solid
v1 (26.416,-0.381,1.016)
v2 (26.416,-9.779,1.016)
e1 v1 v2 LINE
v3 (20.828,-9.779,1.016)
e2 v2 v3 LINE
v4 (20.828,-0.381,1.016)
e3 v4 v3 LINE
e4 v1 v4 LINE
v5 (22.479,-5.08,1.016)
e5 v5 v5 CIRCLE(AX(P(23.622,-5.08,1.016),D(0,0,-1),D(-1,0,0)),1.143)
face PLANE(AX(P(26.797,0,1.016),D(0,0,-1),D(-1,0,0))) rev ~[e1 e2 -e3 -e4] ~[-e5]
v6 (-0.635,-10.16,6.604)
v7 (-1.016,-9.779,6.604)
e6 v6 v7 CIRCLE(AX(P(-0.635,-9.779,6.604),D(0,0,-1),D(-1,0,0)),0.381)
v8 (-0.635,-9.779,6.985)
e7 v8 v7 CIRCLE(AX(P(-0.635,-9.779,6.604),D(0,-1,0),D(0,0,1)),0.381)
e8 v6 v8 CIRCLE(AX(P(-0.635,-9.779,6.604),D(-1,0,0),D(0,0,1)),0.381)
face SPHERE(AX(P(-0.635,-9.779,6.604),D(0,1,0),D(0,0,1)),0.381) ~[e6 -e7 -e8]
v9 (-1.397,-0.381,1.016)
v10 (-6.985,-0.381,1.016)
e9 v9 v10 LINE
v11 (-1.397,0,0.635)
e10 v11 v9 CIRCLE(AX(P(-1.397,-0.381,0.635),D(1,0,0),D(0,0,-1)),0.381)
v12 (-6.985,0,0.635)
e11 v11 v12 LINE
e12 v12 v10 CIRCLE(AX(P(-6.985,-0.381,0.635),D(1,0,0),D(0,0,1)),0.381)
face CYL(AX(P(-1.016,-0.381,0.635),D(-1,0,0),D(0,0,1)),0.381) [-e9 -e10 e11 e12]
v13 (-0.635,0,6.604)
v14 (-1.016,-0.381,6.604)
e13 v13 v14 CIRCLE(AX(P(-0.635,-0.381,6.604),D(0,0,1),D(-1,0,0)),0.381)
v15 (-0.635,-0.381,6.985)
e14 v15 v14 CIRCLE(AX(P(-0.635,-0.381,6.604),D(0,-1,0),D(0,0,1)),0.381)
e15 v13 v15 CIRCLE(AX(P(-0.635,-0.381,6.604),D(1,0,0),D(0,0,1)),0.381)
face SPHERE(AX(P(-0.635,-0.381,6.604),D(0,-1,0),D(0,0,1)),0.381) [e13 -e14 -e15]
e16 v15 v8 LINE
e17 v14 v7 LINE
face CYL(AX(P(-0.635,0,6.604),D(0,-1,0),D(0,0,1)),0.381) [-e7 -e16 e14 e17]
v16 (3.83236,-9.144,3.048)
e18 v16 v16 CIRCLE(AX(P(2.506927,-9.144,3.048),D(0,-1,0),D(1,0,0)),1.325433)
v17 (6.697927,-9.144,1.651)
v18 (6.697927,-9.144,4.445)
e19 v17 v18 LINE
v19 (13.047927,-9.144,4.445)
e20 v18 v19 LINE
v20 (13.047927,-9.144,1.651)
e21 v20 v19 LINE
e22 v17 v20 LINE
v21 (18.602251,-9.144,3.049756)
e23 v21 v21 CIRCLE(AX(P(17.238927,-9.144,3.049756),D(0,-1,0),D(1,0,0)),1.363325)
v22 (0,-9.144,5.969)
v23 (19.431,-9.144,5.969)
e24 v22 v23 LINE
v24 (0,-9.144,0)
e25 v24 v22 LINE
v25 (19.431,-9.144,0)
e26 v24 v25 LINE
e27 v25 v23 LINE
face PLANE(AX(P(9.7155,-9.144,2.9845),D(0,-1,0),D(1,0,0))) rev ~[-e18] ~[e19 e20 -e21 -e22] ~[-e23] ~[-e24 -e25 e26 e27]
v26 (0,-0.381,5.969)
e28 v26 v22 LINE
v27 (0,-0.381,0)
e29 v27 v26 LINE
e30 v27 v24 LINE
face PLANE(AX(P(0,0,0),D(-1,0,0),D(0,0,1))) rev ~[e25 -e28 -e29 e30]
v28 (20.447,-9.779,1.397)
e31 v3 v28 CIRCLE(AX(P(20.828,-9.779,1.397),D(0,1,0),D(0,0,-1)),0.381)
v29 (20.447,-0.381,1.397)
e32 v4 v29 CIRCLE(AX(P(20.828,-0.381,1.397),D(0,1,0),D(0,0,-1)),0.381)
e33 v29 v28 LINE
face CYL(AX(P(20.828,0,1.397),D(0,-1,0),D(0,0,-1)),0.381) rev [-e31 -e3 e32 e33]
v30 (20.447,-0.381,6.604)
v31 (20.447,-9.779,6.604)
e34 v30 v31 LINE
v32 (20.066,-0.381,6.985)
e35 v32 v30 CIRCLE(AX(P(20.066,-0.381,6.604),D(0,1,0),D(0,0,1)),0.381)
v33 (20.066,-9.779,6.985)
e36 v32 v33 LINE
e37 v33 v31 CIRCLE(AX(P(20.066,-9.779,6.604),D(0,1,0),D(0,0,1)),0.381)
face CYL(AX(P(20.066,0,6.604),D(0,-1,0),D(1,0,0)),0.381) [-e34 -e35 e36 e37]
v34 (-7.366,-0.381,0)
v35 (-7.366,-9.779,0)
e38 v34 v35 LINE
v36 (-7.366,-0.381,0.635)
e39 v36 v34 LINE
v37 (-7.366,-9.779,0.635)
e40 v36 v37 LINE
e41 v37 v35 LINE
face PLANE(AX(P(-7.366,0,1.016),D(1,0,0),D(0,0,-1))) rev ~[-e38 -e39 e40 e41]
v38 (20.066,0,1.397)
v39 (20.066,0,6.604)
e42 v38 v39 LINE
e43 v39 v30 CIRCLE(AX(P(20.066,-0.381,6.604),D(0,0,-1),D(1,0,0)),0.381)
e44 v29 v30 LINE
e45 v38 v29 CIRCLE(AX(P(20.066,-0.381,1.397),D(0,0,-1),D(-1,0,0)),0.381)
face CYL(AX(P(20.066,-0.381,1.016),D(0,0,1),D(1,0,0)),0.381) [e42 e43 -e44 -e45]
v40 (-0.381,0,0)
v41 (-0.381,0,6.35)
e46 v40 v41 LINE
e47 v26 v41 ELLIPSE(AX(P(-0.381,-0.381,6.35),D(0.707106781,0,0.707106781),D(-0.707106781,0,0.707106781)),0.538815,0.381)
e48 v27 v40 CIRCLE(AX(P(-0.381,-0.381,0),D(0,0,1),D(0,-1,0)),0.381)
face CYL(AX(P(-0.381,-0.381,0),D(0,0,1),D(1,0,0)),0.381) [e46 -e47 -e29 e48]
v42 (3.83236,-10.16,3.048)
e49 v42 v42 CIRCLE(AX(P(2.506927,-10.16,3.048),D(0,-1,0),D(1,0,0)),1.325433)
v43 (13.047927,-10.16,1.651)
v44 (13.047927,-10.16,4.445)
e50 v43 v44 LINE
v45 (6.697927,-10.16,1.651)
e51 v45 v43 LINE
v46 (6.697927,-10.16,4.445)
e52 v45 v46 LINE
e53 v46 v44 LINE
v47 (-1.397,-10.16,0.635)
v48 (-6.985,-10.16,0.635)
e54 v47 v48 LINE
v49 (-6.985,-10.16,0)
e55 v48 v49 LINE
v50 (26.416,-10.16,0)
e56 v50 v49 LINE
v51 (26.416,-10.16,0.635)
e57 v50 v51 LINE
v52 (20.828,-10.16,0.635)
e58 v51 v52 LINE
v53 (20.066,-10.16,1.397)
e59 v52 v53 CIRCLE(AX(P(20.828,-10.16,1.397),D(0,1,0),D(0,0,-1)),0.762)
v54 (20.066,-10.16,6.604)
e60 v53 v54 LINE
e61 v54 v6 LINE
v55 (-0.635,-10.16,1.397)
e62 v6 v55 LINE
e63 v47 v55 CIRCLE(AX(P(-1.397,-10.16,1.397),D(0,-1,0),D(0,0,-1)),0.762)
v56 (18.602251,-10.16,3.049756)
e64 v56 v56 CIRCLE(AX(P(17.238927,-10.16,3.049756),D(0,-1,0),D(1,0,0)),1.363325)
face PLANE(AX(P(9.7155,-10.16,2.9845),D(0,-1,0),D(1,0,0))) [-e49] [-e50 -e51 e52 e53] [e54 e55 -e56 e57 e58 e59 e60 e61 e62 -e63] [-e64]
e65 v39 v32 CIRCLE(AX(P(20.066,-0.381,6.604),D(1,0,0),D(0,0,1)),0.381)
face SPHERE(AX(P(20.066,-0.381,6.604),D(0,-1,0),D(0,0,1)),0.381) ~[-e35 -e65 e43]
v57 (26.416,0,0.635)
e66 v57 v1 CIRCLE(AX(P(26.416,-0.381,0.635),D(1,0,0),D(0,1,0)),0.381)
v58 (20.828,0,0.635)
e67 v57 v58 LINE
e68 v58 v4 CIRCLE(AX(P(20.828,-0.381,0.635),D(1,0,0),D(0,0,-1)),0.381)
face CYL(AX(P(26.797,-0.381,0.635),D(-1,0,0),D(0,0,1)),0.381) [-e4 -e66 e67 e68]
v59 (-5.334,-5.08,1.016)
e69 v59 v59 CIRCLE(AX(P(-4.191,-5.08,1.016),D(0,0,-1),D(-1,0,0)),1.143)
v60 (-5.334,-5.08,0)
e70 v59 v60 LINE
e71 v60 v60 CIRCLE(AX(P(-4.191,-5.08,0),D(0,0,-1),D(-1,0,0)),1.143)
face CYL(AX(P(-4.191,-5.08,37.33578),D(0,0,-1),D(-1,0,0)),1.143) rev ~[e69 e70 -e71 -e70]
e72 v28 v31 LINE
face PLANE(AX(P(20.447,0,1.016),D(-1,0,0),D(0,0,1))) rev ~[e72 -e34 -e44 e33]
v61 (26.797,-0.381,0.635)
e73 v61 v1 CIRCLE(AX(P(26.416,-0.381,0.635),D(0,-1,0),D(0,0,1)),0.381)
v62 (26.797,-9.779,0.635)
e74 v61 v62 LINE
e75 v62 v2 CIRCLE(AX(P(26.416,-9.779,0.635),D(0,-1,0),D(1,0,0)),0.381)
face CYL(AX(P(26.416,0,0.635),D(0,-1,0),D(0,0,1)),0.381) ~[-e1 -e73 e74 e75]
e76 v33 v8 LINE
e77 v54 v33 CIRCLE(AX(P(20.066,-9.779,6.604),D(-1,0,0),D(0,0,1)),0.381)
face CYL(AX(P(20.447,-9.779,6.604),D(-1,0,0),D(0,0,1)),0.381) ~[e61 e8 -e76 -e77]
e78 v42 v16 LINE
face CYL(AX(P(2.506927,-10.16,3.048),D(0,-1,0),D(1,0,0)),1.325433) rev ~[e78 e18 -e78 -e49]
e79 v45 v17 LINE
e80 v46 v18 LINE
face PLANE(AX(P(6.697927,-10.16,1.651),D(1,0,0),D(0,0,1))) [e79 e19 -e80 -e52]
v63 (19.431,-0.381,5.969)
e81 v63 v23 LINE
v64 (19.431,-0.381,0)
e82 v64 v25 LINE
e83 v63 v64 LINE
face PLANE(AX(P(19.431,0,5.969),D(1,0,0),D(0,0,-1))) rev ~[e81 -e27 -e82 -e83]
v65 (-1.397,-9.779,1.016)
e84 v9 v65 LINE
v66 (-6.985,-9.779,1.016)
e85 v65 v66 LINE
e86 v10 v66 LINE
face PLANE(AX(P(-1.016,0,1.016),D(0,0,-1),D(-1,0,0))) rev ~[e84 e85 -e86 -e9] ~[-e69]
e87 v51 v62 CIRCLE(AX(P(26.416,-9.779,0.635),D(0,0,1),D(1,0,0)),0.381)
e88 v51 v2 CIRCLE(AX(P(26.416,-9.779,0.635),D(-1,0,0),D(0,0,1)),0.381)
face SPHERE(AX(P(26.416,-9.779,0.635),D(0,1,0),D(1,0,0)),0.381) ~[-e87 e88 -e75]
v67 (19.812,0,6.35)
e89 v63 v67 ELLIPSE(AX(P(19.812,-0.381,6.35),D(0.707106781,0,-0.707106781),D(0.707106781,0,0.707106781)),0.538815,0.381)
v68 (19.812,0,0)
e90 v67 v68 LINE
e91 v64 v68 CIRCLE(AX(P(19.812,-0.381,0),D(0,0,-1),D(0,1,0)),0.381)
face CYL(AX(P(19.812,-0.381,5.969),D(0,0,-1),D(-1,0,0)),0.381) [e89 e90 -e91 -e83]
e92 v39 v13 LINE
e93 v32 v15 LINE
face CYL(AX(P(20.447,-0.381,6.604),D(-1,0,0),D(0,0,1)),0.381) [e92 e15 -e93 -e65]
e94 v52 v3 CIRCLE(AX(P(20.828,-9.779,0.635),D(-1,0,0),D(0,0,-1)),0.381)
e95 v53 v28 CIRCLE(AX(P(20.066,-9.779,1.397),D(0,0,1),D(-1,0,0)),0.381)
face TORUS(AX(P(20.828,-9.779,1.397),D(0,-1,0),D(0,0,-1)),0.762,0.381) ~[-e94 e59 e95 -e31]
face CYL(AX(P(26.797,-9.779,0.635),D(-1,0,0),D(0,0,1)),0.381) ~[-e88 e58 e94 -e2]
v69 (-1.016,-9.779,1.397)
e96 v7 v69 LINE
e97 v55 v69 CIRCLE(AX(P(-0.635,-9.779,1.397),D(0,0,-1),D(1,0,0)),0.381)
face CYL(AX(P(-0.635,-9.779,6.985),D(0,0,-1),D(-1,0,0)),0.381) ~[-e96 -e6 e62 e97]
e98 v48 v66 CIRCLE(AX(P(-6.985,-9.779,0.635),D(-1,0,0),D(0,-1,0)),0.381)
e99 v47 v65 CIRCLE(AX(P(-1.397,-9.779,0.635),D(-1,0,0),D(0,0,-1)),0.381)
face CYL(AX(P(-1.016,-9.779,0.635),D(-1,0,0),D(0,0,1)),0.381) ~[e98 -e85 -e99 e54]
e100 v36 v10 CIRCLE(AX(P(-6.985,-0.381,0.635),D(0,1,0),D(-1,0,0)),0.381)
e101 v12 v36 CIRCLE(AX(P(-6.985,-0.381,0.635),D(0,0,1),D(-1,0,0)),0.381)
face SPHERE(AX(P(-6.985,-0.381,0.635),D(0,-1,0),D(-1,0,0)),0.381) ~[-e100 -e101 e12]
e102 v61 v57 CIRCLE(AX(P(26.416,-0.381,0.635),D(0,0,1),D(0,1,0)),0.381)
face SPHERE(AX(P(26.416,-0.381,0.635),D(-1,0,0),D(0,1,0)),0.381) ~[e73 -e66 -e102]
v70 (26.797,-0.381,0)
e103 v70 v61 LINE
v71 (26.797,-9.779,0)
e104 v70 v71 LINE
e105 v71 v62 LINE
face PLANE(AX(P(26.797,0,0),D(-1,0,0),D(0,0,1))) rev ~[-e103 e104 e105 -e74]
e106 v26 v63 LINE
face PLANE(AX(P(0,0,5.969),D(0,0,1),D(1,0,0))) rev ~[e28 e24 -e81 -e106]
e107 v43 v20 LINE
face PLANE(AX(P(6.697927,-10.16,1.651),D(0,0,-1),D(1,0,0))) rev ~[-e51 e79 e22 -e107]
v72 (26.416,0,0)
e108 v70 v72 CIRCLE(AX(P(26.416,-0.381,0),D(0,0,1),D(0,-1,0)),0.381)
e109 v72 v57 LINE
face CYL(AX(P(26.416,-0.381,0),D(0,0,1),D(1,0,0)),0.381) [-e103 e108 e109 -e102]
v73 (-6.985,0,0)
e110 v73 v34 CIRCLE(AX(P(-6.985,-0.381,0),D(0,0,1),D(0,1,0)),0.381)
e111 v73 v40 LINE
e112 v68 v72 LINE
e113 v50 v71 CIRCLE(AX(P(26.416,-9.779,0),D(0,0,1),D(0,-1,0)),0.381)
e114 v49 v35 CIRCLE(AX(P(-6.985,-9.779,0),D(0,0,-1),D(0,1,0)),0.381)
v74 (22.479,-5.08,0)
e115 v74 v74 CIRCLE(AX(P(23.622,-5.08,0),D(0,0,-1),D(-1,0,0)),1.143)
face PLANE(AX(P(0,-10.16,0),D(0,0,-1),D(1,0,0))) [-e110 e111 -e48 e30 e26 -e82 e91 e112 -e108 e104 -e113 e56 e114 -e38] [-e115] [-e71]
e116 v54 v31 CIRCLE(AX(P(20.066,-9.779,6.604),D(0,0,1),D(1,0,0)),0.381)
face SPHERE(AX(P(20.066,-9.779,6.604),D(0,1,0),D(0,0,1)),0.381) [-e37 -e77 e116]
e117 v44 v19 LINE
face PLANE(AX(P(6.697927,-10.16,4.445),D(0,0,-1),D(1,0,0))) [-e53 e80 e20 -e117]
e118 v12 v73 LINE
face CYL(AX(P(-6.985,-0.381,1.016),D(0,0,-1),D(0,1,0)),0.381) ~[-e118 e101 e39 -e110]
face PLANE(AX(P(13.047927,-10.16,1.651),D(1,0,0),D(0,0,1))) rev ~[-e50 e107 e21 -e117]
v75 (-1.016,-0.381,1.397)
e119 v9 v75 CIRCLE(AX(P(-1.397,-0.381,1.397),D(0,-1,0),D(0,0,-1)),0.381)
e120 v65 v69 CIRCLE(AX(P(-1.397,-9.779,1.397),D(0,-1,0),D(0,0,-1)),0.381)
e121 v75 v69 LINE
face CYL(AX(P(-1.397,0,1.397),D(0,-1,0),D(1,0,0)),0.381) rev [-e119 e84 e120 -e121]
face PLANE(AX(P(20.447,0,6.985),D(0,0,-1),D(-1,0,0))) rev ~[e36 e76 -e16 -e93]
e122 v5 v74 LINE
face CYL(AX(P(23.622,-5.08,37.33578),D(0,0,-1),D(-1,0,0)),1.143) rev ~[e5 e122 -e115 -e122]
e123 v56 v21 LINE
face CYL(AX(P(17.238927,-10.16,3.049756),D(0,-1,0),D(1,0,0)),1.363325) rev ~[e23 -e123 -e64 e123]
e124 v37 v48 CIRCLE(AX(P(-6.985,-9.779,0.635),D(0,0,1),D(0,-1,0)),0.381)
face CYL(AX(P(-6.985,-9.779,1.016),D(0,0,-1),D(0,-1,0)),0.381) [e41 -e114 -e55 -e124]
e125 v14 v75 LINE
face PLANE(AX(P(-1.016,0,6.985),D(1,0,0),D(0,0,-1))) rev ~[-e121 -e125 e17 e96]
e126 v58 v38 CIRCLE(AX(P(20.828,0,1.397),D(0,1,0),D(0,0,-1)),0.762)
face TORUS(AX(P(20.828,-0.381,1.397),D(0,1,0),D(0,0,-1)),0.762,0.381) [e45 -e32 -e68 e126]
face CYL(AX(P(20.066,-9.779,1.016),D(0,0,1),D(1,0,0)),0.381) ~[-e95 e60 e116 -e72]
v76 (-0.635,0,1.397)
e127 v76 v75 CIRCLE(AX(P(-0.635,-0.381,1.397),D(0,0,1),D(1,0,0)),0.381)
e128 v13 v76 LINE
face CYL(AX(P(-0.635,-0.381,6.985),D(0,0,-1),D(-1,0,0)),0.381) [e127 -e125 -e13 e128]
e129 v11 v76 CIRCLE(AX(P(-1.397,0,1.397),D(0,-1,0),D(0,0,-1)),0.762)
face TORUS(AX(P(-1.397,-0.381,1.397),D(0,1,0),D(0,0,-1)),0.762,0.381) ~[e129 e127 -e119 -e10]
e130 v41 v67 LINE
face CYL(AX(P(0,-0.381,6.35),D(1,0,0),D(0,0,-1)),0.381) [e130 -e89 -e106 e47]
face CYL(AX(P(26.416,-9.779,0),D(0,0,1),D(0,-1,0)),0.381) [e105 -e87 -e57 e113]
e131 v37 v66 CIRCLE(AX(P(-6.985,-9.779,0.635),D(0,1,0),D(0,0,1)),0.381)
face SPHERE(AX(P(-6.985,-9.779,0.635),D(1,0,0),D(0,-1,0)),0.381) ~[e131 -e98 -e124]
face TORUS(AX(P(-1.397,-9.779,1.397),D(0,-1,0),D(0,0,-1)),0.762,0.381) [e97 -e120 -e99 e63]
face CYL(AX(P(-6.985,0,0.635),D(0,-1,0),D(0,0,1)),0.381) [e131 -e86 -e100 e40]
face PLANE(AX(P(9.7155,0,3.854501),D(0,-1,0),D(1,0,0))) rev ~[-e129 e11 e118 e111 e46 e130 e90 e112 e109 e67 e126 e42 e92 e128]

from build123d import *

# Parameters (mm, degrees)
F1_DEPTH = 10.16
F3_D     = 2.286
F4_W     = 19.431
F4_H     = 5.969
F4_R     = 1.3254329065
F4_W_2   = 6.35
F4_H_2   = 2.794
F4_R_2   = 1.3633247541
F5_DEPTH = 1.016
F6_R     = 0.381


with BuildPart() as f1:
    # F0 (on Front) → F1 (new body)
    with BuildSketch(Plane.XZ):
        Polygon((-7.366, 1.016), (-7.366, 0), (0, 0), (0, 5.969), (19.431, 5.969), (19.431, 0), (26.797, 0), (26.797, 1.016), (20.447, 1.016), (20.447, 6.985), (-1.016, 6.985), (-1.016, 1.016), align=None)
    extrude(amount=F1_DEPTH)

    # F3 (through all)
    with Locations(Plane.XY.offset(1.016)):
        with Locations((-4.191, -5.08), (23.622, -5.08)):
            Hole(F3_D / 2)

    # F4 (on face) → F5 (join)
    with BuildSketch(Plane.XZ.offset(10.16)):
        with Locations((9.7155, 2.9845)):
            Rectangle(F4_W, F4_H)
        with Locations((2.5069266703, 3.048)):
            Circle(F4_R, mode=Mode.SUBTRACT)
        with Locations((9.8729266703, 3.048)):
            Rectangle(F4_W_2, F4_H_2, mode=Mode.SUBTRACT)
        with Locations((17.2389266703, 3.0497561675)):
            Circle(F4_R_2, mode=Mode.SUBTRACT)
    extrude(amount=-F5_DEPTH)

    # F6
    f6_edges = [f1.edges().sort_by_distance(p)[0] for p in [
        (20.447, -5.08, 6.985),
        (-1.016, -5.08, 6.985),
        (9.7155, 0, 6.985),
        (9.7155, -10.16, 6.985),
        (-1.016, -10.16, 4.0005),
        (-1.016, -5.08, 1.016),
        (-4.191, -10.16, 1.016),
        (-7.366, -10.16, 0.508),
        (-7.366, -5.08, 1.016),
        (-7.366, 0, 0.508),
        (-4.191, 0, 1.016),
        (0, 0, 2.9845),
        (9.7155, 0, 5.969),
        (19.431, 0, 2.9845),
        (20.447, 0, 4.0005),
        (20.447, -5.08, 1.016),
        (23.622, 0, 1.016),
        (26.797, 0, 0.508),
        (26.797, -5.08, 1.016),
        (26.797, -10.16, 0.508),
        (23.622, -10.16, 1.016),
        (20.447, -10.16, 4.0005),
        (-1.016, 0, 4.0005),
    ]]
    fillet(f6_edges, radius=F6_R)


solid = f1.part
